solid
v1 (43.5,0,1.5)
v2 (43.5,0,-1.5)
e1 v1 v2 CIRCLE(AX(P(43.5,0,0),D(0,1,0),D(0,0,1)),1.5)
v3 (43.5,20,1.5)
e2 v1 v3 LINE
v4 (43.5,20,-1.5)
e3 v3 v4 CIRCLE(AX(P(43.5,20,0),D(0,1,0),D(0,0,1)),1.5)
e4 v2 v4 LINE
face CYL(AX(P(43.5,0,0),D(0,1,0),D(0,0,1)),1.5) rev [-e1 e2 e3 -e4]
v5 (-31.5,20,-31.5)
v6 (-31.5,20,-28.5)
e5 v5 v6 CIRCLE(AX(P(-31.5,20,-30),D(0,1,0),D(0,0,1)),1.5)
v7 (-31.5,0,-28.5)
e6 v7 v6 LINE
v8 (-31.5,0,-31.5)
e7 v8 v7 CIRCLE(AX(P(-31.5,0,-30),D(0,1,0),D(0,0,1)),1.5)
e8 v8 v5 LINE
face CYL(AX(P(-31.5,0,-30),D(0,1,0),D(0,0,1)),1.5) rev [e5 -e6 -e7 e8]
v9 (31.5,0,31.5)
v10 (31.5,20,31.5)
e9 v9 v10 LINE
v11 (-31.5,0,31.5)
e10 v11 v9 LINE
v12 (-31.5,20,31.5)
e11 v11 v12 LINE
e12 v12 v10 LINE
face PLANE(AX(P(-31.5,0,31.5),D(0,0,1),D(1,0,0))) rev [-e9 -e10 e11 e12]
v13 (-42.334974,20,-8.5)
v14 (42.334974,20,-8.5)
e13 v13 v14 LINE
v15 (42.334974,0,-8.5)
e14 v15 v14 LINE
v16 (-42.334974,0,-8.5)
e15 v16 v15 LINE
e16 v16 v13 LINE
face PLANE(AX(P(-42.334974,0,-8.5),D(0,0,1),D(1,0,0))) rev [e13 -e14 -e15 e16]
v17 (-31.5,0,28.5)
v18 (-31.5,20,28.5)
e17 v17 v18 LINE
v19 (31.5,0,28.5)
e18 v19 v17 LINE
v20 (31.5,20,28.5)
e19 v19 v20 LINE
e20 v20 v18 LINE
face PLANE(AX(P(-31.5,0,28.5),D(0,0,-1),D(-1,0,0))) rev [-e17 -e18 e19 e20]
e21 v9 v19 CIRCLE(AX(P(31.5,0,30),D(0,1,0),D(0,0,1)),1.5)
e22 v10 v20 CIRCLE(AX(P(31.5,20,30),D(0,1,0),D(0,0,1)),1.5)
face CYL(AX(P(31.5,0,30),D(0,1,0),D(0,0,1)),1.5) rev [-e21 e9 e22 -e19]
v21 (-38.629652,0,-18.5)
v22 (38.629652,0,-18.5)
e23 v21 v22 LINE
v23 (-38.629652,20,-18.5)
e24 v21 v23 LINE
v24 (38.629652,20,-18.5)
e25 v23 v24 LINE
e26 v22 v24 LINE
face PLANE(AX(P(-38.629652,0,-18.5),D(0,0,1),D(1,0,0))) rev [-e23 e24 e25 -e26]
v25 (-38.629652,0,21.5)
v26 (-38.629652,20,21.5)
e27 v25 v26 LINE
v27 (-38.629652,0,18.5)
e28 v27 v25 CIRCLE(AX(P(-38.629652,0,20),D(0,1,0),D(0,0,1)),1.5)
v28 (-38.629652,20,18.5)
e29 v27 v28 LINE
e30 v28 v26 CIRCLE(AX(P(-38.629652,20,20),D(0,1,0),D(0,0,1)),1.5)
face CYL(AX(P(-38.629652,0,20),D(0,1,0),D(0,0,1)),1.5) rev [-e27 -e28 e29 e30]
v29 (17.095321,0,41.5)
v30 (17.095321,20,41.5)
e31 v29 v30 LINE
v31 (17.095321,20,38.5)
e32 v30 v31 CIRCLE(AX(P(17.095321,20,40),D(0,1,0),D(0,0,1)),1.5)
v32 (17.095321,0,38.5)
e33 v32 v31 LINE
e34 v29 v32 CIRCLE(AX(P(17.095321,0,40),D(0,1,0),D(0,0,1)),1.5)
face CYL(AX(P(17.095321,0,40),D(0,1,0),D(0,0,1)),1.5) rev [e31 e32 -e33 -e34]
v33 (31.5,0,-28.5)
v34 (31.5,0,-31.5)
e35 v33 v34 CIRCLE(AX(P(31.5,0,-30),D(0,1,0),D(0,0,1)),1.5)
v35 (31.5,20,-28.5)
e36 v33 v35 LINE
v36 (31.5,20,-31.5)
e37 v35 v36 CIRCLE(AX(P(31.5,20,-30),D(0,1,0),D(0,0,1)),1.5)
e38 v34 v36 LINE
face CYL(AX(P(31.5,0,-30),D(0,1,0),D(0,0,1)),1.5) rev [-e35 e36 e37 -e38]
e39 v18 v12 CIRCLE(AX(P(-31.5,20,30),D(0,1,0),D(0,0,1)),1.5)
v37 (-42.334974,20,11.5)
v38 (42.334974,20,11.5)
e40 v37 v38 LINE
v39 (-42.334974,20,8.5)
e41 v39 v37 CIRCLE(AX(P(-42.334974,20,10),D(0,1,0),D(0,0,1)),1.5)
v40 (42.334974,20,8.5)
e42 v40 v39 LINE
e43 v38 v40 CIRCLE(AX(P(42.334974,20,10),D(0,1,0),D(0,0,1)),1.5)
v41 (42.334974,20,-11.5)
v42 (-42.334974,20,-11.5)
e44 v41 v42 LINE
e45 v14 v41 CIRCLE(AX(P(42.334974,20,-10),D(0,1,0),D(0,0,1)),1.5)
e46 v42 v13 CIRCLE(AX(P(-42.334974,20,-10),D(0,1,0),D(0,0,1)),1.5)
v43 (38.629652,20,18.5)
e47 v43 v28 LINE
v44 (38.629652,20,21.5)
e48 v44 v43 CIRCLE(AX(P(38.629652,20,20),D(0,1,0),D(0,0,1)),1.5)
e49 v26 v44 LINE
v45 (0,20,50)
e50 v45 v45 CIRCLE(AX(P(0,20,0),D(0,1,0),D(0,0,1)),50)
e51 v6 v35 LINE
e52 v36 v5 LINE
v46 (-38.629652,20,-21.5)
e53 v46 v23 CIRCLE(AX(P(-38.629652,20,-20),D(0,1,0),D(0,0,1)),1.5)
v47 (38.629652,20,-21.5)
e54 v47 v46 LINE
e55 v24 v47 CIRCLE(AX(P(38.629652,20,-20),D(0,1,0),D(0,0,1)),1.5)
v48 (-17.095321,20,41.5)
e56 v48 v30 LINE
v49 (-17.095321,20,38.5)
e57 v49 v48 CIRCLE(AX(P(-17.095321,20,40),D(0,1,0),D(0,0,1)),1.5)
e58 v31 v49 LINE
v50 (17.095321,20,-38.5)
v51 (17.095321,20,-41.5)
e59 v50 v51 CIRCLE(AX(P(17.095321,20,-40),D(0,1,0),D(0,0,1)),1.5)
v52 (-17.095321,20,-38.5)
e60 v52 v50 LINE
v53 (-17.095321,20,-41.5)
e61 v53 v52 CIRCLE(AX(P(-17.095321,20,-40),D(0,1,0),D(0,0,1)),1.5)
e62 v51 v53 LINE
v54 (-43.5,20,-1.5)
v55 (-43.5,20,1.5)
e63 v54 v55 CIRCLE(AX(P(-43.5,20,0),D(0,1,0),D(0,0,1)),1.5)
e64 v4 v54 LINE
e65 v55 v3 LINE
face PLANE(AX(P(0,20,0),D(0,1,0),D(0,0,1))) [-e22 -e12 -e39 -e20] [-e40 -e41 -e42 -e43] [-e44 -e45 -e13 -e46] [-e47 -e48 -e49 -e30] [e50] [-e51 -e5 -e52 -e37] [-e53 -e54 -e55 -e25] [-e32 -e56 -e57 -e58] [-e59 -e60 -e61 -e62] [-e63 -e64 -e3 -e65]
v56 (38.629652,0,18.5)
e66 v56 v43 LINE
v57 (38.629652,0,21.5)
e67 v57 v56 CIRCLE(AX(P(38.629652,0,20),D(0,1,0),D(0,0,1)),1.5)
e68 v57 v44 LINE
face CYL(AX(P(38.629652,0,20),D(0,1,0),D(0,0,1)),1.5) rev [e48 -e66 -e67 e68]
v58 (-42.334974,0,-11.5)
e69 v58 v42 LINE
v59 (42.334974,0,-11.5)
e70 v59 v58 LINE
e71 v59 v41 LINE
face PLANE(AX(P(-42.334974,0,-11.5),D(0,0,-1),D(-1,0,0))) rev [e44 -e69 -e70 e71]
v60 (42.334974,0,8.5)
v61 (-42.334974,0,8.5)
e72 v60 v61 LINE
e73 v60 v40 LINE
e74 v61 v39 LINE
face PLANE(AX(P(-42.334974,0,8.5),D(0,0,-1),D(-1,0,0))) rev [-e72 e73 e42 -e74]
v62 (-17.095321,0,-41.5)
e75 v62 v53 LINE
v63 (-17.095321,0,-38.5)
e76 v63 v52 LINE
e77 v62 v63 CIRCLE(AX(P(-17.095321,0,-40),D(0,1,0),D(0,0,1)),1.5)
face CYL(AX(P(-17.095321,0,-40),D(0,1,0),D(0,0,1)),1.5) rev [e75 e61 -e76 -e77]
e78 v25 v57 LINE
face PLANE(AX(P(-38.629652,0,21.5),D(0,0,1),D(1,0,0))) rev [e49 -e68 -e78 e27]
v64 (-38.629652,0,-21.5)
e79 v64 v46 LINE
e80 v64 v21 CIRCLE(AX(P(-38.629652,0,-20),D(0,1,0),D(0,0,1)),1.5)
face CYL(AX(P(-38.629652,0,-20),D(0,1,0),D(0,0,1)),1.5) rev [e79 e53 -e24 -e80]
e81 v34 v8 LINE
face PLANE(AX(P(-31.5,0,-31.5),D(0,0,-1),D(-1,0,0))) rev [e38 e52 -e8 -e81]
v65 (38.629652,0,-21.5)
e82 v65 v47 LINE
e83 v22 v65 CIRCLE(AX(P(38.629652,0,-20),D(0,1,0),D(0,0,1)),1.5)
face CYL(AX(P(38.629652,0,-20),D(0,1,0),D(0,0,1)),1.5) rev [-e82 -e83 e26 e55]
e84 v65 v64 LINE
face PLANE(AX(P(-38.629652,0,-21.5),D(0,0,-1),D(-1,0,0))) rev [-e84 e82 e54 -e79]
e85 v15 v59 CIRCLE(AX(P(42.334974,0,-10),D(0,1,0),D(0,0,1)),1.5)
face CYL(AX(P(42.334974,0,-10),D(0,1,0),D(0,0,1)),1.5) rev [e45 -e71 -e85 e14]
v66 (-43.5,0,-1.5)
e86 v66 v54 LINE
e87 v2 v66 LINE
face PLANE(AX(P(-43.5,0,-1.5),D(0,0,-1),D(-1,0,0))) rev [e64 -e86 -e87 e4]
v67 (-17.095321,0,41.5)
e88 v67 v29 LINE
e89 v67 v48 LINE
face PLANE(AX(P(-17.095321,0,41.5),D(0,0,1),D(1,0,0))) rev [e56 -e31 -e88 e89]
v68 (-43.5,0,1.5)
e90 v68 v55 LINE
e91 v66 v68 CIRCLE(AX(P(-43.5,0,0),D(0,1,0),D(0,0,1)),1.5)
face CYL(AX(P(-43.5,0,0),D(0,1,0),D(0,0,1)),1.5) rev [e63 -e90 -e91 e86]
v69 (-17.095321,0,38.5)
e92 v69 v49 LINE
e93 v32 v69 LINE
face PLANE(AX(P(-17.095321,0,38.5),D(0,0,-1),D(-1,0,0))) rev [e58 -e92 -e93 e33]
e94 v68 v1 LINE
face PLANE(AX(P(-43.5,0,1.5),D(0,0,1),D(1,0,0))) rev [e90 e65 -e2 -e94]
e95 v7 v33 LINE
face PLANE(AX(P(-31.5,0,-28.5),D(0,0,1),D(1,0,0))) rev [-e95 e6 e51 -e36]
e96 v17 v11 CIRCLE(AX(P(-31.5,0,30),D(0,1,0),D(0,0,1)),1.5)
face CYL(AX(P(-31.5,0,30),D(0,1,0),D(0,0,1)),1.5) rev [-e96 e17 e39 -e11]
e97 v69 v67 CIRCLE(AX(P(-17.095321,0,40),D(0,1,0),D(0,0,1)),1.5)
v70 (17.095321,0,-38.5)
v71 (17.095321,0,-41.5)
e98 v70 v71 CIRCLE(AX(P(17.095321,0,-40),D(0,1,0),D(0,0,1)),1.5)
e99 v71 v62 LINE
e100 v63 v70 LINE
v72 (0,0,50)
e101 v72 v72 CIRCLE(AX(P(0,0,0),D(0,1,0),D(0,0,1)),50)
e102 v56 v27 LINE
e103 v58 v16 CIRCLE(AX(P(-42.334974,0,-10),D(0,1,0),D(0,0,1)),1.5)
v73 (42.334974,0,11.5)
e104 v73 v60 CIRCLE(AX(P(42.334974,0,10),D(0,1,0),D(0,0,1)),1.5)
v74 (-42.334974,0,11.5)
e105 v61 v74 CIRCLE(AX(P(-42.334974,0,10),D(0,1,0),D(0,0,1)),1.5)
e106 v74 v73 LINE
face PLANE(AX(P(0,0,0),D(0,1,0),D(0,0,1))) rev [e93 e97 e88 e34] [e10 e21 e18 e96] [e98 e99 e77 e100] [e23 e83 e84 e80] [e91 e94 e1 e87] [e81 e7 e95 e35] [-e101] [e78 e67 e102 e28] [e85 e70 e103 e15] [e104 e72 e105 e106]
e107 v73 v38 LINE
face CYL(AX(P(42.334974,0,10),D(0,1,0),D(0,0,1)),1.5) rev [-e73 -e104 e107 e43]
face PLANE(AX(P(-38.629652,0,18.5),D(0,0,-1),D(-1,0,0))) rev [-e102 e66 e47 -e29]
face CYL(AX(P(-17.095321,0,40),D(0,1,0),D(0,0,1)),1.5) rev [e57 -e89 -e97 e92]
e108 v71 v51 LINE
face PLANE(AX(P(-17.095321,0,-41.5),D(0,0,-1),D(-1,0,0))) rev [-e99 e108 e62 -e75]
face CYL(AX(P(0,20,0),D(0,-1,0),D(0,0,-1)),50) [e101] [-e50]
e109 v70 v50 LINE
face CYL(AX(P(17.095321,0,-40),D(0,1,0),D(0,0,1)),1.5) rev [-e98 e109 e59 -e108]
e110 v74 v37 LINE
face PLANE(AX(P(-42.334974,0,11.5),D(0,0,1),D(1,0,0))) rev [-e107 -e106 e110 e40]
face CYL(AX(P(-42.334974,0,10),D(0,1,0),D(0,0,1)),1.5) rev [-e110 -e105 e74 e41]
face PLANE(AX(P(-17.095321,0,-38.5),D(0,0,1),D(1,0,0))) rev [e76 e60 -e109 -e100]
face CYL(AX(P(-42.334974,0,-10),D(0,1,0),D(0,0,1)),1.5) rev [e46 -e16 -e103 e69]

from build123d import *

# Parameters (mm, degrees)
SKETCH_3_R             = 50
EXTRUDE_2_DEPTH        = 20
CUT_EXTRUDE_2_DEPTH    = 74.484692283
PATTERN_LINEAR_2_DEPTH = 20


# Read off the part's stored shape, not the designer's step: 阵列(线性)2
with BuildPart() as part:
    # 草图3 → 凸台-拉伸2 (new body)
    with BuildSketch(Plane(origin=(0, 0, 0), x_dir=(1, 0, 0), z_dir=(0, 1, 0))):
        with Locations(Location((0, 0, 0), (0, 0, 270))):
            Circle(SKETCH_3_R)
    extrude(amount=EXTRUDE_2_DEPTH)

    # 草图4 → 切除-拉伸2 (cut, through all)
    with BuildSketch(Plane(origin=(0, 20, 0), x_dir=(1, 0, 0), z_dir=(0, 1, 0))):
        with BuildLine():
            Line((-17.095320997, -38.5), (17.095320997, -38.5))
            ThreePointArc((17.095320997, -38.5), (18.595320997, -40), (17.095320997, -41.5))
            Line((17.095320997, -41.5), (-17.095320997, -41.5))
            ThreePointArc((-17.095320997, -41.5), (-18.595320997, -40), (-17.095320997, -38.5))
        make_face()
    extrude(amount=-CUT_EXTRUDE_2_DEPTH, mode=Mode.SUBTRACT)

    # 阵列(线性)2 outline → 阵列(线性)2 (cut)
    with BuildSketch(Plane(origin=(0, 0, 0), x_dir=(1, 0, 0), z_dir=(0, 1, 0))):
        with BuildLine():
            Line((17.095320997, 41.5), (-17.095320997, 41.5))
            ThreePointArc((-17.095320997, 41.5), (-18.595320997, 40), (-17.095320997, 38.5))
            Line((-17.095320997, 38.5), (17.095320997, 38.5))
            ThreePointArc((17.095320997, 38.5), (18.595320997, 40), (17.095320997, 41.5))
        make_face()
        with BuildLine():
            Line((31.5, 31.5), (-31.5, 31.5))
            ThreePointArc((-31.5, 31.5), (-33, 30), (-31.5, 28.5))
            Line((-31.5, 28.5), (31.5, 28.5))
            ThreePointArc((31.5, 28.5), (33, 30), (31.5, 31.5))
        make_face()
        with BuildLine():
            Line((38.629651823, 21.5), (-38.629651823, 21.5))
            ThreePointArc((-38.629651823, 21.5), (-40.129651823, 20), (-38.629651823, 18.5))
            Line((-38.629651823, 18.5), (38.629651823, 18.5))
            ThreePointArc((38.629651823, 18.5), (40.129651823, 20), (38.629651823, 21.5))
        make_face()
        with BuildLine():
            Line((42.334973721, 11.5), (-42.334973721, 11.5))
            ThreePointArc((-42.334973721, 11.5), (-43.834973721, 10), (-42.334973721, 8.5))
            Line((-42.334973721, 8.5), (42.334973721, 8.5))
            ThreePointArc((42.334973721, 8.5), (43.834973721, 10), (42.334973721, 11.5))
        make_face()
        with BuildLine():
            Line((43.5, 1.5), (-43.5, 1.5))
            ThreePointArc((-43.5, 1.5), (-45, 0), (-43.5, -1.5))
            Line((-43.5, -1.5), (43.5, -1.5))
            ThreePointArc((43.5, -1.5), (45, 0), (43.5, 1.5))
        make_face()
        with BuildLine():
            Line((42.334973721, -8.5), (-42.334973721, -8.5))
            ThreePointArc((-42.334973721, -8.5), (-43.834973721, -10), (-42.334973721, -11.5))
            Line((-42.334973721, -11.5), (42.334973721, -11.5))
            ThreePointArc((42.334973721, -11.5), (43.834973721, -10), (42.334973721, -8.5))
        make_face()
        with BuildLine():
            Line((38.629651823, -18.5), (-38.629651823, -18.5))
            ThreePointArc((-38.629651823, -18.5), (-40.129651823, -20), (-38.629651823, -21.5))
            Line((-38.629651823, -21.5), (38.629651823, -21.5))
            ThreePointArc((38.629651823, -21.5), (40.129651823, -20), (38.629651823, -18.5))
        make_face()
        with BuildLine():
            Line((31.5, -28.5), (-31.5, -28.5))
            ThreePointArc((-31.5, -28.5), (-33, -30), (-31.5, -31.5))
            Line((-31.5, -31.5), (31.5, -31.5))
            ThreePointArc((31.5, -31.5), (33, -30), (31.5, -28.5))
        make_face()
    extrude(amount=PATTERN_LINEAR_2_DEPTH, mode=Mode.SUBTRACT)


solid = part.part
